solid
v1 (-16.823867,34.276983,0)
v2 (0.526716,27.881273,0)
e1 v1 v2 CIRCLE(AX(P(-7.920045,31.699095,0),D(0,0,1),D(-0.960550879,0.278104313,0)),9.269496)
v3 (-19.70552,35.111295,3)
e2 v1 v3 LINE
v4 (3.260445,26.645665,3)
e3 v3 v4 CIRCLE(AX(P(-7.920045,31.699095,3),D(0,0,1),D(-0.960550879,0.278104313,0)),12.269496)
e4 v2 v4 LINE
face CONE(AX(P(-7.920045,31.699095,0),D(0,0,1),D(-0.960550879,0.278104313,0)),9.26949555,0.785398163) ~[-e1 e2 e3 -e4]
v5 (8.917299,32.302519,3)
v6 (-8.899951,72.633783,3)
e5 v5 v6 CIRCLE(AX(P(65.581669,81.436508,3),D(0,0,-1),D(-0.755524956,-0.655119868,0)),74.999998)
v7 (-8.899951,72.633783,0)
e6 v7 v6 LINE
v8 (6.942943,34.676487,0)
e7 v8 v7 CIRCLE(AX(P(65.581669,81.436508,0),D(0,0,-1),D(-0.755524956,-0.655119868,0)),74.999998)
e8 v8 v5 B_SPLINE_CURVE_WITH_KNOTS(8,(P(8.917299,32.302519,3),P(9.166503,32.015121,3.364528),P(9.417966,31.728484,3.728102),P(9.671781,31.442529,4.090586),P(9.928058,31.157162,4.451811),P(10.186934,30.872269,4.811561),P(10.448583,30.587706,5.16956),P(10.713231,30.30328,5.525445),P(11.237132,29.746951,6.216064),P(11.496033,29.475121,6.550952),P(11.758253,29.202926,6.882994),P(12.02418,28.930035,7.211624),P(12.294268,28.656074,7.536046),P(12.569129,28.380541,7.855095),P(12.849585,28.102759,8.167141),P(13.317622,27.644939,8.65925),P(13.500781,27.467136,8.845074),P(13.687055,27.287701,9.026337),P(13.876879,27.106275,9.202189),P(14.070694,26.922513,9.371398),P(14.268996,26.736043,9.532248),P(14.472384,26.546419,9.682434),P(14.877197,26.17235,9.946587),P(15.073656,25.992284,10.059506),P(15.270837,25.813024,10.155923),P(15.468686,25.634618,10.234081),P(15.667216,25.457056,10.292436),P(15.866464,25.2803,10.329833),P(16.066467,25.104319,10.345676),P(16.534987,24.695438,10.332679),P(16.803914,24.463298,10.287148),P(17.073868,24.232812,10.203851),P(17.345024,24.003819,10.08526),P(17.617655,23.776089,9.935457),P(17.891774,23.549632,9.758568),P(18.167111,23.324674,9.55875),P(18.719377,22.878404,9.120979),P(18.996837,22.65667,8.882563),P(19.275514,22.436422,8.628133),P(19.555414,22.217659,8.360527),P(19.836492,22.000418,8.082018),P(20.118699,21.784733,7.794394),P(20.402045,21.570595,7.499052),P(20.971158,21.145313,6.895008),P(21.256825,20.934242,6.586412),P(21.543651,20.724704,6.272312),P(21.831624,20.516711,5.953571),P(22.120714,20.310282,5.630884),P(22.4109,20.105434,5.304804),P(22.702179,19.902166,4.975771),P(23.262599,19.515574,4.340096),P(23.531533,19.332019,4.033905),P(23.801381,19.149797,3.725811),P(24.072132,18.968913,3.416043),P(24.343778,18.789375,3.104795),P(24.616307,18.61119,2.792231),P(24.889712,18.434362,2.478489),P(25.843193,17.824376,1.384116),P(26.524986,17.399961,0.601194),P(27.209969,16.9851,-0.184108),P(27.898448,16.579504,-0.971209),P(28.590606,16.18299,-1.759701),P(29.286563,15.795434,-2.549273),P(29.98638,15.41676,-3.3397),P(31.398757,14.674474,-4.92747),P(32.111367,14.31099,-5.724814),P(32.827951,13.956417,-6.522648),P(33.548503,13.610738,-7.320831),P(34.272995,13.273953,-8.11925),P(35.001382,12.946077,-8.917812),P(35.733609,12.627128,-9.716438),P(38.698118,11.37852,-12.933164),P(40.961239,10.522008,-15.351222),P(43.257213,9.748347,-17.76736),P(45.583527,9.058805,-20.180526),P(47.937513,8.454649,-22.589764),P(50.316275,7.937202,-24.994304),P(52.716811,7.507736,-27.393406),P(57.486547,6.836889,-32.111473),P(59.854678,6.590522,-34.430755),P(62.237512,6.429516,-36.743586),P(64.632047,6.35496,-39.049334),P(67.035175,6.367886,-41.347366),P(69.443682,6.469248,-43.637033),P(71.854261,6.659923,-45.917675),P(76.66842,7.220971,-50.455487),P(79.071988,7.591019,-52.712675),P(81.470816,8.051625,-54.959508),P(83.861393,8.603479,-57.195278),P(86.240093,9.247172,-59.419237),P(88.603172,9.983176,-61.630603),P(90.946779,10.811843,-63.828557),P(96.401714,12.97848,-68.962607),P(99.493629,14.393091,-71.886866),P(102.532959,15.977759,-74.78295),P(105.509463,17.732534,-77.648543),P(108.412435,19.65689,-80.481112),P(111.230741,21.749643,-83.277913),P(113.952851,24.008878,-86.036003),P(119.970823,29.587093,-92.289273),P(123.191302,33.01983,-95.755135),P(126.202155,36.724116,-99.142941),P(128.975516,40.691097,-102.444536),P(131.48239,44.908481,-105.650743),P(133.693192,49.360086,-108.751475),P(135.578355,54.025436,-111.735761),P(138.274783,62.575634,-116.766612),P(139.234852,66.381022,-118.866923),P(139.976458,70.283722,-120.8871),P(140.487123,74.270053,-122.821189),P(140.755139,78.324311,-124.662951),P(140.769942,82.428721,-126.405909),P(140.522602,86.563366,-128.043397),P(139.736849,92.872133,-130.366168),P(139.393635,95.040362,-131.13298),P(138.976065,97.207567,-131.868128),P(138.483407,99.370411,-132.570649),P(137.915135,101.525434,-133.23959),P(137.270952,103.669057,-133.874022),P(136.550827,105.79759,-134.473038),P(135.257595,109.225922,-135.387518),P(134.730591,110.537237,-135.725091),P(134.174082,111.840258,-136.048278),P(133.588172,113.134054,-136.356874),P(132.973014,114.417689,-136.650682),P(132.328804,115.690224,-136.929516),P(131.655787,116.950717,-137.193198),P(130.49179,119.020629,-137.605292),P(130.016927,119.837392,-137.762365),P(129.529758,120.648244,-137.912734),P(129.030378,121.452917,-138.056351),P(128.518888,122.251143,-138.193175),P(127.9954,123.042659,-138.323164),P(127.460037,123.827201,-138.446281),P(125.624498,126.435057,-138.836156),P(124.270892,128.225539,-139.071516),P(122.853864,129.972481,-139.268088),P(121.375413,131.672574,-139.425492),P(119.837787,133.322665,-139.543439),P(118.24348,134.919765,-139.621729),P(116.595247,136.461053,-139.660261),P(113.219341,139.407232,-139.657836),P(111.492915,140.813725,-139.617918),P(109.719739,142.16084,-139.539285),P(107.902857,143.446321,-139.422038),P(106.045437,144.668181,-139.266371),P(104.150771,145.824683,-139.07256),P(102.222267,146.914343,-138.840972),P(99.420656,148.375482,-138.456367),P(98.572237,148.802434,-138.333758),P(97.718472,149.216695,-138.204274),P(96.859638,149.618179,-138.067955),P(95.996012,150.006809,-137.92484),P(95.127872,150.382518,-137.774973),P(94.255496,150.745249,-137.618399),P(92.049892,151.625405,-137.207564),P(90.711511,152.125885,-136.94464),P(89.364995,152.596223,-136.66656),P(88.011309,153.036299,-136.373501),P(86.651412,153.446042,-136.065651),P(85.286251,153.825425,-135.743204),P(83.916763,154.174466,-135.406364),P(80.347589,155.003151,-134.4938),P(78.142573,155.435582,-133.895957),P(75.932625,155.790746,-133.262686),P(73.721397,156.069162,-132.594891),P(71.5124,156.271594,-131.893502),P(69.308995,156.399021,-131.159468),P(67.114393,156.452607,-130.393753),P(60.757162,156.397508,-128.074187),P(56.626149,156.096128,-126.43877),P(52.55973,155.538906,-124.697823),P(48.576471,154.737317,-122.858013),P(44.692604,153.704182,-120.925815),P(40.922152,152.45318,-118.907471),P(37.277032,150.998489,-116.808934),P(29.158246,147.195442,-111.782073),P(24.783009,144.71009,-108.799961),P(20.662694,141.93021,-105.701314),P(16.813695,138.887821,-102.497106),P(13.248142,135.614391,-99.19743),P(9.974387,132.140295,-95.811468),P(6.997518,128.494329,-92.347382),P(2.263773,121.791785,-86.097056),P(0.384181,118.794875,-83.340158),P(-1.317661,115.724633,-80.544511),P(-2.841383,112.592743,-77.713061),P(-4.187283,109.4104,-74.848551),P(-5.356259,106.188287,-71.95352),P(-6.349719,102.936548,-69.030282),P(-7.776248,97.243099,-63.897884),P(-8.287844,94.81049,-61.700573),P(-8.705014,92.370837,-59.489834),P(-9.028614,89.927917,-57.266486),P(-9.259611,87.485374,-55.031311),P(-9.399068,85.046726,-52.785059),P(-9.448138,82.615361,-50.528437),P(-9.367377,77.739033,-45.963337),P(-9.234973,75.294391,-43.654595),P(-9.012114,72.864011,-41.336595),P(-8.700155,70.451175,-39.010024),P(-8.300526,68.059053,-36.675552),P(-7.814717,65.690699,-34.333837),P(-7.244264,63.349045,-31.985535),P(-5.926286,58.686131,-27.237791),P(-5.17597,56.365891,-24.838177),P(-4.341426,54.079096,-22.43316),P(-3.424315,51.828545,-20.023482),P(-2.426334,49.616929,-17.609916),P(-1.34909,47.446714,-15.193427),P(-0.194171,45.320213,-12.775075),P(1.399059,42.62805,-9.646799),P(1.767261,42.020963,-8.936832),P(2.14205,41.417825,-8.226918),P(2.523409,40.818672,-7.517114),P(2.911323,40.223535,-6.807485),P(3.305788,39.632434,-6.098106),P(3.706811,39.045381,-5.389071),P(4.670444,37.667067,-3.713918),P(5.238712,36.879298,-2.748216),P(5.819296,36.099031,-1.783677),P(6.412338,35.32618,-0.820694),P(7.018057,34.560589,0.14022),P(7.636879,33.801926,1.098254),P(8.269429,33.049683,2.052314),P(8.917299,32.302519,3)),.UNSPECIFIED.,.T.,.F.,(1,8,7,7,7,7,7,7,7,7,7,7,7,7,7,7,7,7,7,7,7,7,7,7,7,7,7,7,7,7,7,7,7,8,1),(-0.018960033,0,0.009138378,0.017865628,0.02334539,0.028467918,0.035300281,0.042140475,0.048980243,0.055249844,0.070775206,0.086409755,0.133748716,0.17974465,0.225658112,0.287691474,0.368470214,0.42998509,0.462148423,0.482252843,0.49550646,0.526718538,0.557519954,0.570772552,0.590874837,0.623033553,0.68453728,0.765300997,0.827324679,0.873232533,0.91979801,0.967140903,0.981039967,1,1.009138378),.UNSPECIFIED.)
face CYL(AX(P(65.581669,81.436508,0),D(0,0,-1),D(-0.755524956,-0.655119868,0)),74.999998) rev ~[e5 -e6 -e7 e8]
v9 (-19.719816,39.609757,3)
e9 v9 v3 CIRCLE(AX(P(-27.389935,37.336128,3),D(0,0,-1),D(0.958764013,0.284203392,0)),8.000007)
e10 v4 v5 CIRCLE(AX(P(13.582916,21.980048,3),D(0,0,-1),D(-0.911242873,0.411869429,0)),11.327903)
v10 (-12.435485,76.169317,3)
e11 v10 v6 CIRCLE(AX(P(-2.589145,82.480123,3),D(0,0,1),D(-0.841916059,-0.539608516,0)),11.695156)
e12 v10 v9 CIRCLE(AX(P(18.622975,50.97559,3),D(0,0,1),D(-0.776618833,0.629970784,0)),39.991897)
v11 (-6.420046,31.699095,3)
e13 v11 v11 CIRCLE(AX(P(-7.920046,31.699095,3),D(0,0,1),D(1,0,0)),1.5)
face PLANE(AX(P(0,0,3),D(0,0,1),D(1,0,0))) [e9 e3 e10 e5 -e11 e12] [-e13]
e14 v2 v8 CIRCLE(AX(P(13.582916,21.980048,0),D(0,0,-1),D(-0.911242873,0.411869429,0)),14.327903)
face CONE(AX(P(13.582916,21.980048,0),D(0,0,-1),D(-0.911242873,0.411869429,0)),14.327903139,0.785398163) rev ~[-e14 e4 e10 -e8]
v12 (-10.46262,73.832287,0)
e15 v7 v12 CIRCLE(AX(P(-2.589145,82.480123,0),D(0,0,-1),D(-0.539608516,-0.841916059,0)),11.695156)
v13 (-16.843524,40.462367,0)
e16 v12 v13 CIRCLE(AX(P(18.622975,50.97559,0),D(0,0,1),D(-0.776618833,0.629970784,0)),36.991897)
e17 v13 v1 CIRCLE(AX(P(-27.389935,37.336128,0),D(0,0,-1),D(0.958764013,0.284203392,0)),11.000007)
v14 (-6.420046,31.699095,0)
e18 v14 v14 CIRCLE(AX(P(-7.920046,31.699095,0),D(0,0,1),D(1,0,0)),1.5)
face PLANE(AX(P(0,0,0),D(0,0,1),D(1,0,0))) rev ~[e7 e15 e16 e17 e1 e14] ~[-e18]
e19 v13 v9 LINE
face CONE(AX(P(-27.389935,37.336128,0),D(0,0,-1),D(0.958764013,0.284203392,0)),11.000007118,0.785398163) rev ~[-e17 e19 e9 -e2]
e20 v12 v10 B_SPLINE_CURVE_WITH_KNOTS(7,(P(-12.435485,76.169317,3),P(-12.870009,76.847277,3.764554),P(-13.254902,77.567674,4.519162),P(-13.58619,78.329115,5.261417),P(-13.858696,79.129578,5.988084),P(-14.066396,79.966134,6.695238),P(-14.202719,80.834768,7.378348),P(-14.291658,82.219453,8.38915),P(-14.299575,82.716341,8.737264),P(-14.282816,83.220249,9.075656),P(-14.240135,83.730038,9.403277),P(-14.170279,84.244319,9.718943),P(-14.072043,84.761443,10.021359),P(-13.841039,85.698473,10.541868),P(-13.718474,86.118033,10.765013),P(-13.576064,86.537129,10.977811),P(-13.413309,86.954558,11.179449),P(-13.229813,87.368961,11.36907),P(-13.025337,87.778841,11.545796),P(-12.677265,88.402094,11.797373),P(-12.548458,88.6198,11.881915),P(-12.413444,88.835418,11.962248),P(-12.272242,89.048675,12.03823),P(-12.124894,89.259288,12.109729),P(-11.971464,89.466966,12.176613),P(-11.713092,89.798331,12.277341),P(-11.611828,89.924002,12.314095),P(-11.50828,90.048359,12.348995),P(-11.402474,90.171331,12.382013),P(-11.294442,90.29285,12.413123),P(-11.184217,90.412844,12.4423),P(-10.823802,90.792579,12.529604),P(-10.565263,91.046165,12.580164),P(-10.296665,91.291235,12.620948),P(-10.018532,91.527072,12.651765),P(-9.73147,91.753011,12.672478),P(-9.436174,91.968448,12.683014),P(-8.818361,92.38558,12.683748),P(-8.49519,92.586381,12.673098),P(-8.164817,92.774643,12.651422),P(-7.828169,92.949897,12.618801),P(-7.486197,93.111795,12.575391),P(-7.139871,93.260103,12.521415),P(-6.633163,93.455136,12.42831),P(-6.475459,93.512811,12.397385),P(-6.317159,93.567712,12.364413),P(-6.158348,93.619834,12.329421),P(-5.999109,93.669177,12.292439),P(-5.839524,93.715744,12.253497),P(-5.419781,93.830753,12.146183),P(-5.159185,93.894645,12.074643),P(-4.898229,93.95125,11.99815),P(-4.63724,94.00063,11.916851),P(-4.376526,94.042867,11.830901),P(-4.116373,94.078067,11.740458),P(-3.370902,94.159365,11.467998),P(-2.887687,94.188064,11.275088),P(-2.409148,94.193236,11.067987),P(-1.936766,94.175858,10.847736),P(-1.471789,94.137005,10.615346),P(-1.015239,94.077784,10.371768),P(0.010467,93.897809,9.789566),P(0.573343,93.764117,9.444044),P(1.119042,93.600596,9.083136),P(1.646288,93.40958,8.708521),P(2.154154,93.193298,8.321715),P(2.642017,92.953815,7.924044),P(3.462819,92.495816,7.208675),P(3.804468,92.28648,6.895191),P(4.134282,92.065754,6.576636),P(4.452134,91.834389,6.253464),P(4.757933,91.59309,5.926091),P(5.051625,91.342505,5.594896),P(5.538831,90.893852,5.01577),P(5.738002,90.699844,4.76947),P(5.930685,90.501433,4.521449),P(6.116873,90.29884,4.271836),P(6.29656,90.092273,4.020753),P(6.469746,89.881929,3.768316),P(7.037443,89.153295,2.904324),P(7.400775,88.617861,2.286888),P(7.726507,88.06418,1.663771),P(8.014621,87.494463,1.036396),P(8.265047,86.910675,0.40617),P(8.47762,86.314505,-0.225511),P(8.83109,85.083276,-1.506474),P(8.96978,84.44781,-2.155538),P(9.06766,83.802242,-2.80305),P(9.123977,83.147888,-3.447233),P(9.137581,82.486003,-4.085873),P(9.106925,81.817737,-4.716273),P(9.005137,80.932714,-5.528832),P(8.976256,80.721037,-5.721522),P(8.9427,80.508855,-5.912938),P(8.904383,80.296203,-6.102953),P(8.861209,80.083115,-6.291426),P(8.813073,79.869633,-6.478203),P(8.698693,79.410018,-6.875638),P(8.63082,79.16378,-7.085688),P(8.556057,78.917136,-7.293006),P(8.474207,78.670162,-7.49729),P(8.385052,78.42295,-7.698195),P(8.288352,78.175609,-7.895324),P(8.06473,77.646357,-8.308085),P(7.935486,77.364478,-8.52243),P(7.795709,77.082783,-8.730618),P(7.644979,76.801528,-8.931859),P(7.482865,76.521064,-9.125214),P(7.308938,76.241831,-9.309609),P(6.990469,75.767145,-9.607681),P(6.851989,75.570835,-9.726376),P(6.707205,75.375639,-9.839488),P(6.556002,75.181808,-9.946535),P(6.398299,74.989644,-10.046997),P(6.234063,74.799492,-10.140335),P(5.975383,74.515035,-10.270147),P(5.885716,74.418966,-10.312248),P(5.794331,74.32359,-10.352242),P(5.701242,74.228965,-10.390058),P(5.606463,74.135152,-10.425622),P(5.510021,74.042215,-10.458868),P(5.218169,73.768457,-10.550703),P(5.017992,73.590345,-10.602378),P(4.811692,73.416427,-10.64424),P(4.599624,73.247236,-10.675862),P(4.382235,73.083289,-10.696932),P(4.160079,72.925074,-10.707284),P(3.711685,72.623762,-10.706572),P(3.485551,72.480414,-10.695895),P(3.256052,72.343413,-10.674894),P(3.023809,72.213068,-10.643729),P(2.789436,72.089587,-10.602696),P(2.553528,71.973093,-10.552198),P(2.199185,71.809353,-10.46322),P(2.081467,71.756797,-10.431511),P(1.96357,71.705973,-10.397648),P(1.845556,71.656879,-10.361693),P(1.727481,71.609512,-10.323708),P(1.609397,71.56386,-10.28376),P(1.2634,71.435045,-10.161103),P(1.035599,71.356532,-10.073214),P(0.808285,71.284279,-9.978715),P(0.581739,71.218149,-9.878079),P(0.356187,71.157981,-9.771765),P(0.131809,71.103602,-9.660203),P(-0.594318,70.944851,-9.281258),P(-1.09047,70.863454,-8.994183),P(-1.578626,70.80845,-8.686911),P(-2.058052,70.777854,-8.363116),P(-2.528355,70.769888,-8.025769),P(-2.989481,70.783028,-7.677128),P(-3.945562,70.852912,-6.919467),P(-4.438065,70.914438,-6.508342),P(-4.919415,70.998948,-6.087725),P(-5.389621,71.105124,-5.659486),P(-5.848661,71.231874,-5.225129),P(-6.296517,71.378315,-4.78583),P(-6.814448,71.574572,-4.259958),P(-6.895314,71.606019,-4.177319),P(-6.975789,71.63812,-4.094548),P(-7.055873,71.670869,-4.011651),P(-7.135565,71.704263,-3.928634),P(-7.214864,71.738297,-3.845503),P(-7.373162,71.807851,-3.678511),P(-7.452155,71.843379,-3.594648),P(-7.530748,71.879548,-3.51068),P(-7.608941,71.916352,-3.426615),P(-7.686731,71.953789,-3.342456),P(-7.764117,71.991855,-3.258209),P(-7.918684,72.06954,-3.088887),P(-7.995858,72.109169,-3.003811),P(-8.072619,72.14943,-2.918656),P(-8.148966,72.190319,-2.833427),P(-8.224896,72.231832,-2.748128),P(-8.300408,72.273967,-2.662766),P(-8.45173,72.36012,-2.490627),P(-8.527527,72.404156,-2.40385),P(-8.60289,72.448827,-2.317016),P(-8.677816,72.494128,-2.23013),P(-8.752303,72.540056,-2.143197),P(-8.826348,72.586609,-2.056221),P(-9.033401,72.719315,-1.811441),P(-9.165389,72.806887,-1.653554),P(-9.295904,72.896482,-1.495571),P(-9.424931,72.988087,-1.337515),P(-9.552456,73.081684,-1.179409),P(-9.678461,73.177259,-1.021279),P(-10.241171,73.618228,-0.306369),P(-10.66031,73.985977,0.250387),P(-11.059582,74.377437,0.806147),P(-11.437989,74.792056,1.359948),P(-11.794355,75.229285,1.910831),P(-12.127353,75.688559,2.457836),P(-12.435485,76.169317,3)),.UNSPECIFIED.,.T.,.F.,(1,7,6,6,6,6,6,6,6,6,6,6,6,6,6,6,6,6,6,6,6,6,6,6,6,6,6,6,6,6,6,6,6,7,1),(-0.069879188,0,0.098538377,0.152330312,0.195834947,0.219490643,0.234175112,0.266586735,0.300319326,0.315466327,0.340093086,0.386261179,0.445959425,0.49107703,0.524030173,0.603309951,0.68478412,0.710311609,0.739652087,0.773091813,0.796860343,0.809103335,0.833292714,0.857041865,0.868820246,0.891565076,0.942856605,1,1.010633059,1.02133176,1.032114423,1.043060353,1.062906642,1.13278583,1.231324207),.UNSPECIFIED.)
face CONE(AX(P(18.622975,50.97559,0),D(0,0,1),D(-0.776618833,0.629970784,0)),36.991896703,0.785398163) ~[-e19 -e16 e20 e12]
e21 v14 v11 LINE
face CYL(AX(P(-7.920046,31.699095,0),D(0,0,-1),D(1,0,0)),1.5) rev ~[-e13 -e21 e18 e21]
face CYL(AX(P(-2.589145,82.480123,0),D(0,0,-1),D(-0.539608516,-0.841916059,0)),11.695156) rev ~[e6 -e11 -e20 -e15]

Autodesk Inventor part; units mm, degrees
ref_plane "YZ Plane" through (0, 0, 0) normal (1, 0, 0) x (0, 1, 0)
ref_plane "XZ Plane" through (0, 0, 0) normal (0, 1, 0) x (-1, 0, 0)
ref_plane "XY Plane" through (0, 0, 0) normal (0, 0, 1) x (1, 0, 0)
sketch "Sketch1" plane through (0, 0, 0) normal (0, 0, 1) x (1, 0, 0)
  arc A0 (-12.435485, 76.169317) -> (-19.719816, 39.609757) centre (18.622974, 50.975591) ccw
  arc A1 (-12.435485, 76.169317) -> (-8.899951, 72.633783) centre (-2.589145, 82.480123) ccw
  line L0 (-12.435485, 76.169317) -> (-8.899951, 72.633783) construction
  line L1 (-12.435485, 76.169317) -> (-7.435485, 76.169317) construction
  arc A2 (-8.899951, 72.633783) -> (8.917299, 32.302519) centre (65.581671, 81.436509) ccw
  arc A3 (8.917299, 32.302519) -> (3.260445, 26.645665) centre (13.582916, 21.980048) ccw
  line L2 (8.917299, 32.302519) -> (3.260445, 26.645665) construction
  line L3 (8.917299, 32.302519) -> (16.917299, 32.302519) construction
  arc A4 (-19.70552, 35.111295) -> (3.260445, 26.645665) centre (-7.920046, 31.699095) ccw
  arc A5 (-19.70552, 35.111295) -> (-19.719816, 39.609757) centre (-27.389927, 37.336129) ccw
  circle A6 centre (-7.920046, 31.699095) radius 1.5
  line L4 (-21.368921, 76.169317) -> (8.917299, 76.169317)
  line L5 (8.917299, 76.169317) -> (8.917299, 19.429599)
  line L6 (8.917299, 19.429599) -> (-21.368921, 19.429599)
  line L7 (-21.368921, 19.429599) -> (-21.368921, 76.169317)
  line L8 (-21.368921, 39.609757) -> (3.327974, 39.609757)
  line L9 (-19.719816, 39.609757) -> (3.327974, 39.609757) construction
  line L10 (3.327974, 39.609757) -> (3.327974, 76.169317)
  line L11 (3.327974, 39.609757) -> (39.887534, 39.609757) construction
  dimension "d25" = 39.9919
  dimension "d26" = 5
  dimension "d27" = 45
  dimension "d28" = 75
  dimension "d29" = 8
  dimension "d30" = 135
  dimension "d31" = 8
  dimension "d32" = 3
  dimension "d51" = 0
  dimension "d52" = 90
sketch "Sketch1 outline for Extrusion1" plane through (0, 0, 0) normal (0, 0, 1) x (1, 0, 0)
  arc A0 (-8.899951, 72.633783) -> (-12.435485, 76.169317) centre (-2.589145, 82.480123) cw
  arc A1 (8.917299, 32.302519) -> (-8.899951, 72.633783) centre (65.581671, 81.436509) cw
  arc A2 (-12.435485, 76.169317) -> (-19.719816, 39.609757) centre (18.622974, 50.975591) ccw
  arc A3 (3.260445, 26.645665) -> (8.917299, 32.302519) centre (13.582916, 21.980048) cw
  arc A4 (-19.719816, 39.609757) -> (-19.70552, 35.111295) centre (-27.389927, 37.336129) cw
  arc A5 (-19.70552, 35.111295) -> (3.260445, 26.645665) centre (-7.920046, 31.699095) ccw
  circle A6 centre (-7.920046, 31.699095) radius 1.5
extrude "Extrusion1" add sketch "Sketch1 outline for Extrusion1" along normal blind 3
sketch "Sketch2" plane through (0, 0, 0) normal (0, 0, -1) x (-1, 0, 0)
  arc A0 (8.899951, 72.633783) -> (12.435485, 76.169317) centre (2.589145, 82.480123) ccw
  arc A1 (19.719816, 39.609757) -> (12.435485, 76.169317) centre (-18.622974, 50.975591) ccw
  arc A2 (-8.917299, 32.302519) -> (8.899951, 72.633783) centre (-65.581671, 81.436509) ccw
  arc A3 (19.719816, 39.609757) -> (19.70552, 35.111295) centre (27.389927, 37.336129) ccw
  line L0 (19.719816, 39.609757) -> (0.192482, 45.398184)
  arc A4 (11.216243, 74.583931) -> (12.435485, 76.169317) centre (2.589145, 82.480123) ccw
  arc A5 (9.327537, 42.690308) -> (11.216243, 74.583931) centre (-26.326768, 60.804454) ccw
  point P0 (0, 0)
  dimension "d35" = 0
  dimension "d37" = 2
sketch "Sketch2 outline for Extrusion2" plane through (0, 0, 0) normal (0, 0, -1) x (-1, 0, 0)
  arc A0 (19.719816, 39.609757) -> (12.435485, 76.169317) centre (-18.622974, 50.975591) ccw
  line L0 (9.327537, 42.690308) -> (19.719816, 39.609757)
  arc A1 (11.216243, 74.583931) -> (9.327537, 42.690308) centre (-26.326768, 60.804454) cw
  arc A2 (12.435485, 76.169317) -> (11.216243, 74.583931) centre (2.589145, 82.480123) cw
extrude "Extrusion2" add sketch "Sketch2 outline for Extrusion2" against normal blind 3
sketch "Sketch5" plane through (0, 0, 3) normal (0, 0, 1) x (1, 0, 0)
  line L0 (-9.327537, 42.690308) -> (-19.719816, 39.609757)
  line L1 (-9.327537, 42.690308) -> (-9.327537, 72.921318)
  arc A0 (-12.435485, 76.169317) -> (-8.899951, 72.633783) centre (-2.589145, 82.480123) ccw
  line L2 (-9.327537, 42.690308) -> (20.903473, 42.690308) construction
  line L3 (-19.719816, 39.609757) -> (-9.327537, 39.609757)
  line L4 (-19.719816, 39.609757) -> (-9.327537, 39.609757) construction
  line L5 (-9.327537, 39.609757) -> (-9.327537, 42.690308)
  line L6 (-21.368921, 76.169317) -> (-21.368921, 42.690308)
  arc A1 (-12.435485, 76.169317) -> (-19.719816, 39.609757) centre (18.622974, 50.975591) ccw
  line L7 (-19.719816, 39.609757) -> (-21.368921, 39.609757)
  line L8 (-21.368921, 39.609757) -> (-21.368921, 43.268072)
  line L9 (-21.368921, 76.169317) -> (-9.327537, 76.169317)
  line L10 (-9.327537, 72.921318) -> (-9.327537, 76.169317)
  point P0 (0, 0)
  point P1 (-11.216243, 74.583931)
  point P2 (-21.368921, 50.975591)
  dimension "d47" = 90
  dimension "d48" = 0
sketch "Sketch6" plane through (0, 0, 3) normal (0, 0, 1) x (-1, 0, 0)
  line L0 (21.368921, -76.169317) -> (21.368921, -42.690308)
  arc A0 (19.719816, 39.609757) -> (12.435485, 76.169317) centre (-18.622974, 50.975591) ccw
  point P0 (0, 0)
  point P1 (21.368921, 50.975591)
ref_plane "Work Plane3" through (-9.327537, 76.169317, 3) normal (0, 0, -1) x (0, -1, 0)
extrude "Extrusion3" [suppressed]
draft "FaceDraft7" angle 45 pull direction (0, 0, -1) faces at (-13.99815, 74.110283, 1) (-19.580116, 35.602105, 2) (0.992604, 23.266705, 2) (3.667398, 27.457629, 1) fixed edges at (-20.597986, 58.790194, 3) (-19.389968, 37.361551, 3) (-12.163655, 20.186828, 3) (5.572879, 29.990085, 3)
properties part number "Hoja de Corte"
